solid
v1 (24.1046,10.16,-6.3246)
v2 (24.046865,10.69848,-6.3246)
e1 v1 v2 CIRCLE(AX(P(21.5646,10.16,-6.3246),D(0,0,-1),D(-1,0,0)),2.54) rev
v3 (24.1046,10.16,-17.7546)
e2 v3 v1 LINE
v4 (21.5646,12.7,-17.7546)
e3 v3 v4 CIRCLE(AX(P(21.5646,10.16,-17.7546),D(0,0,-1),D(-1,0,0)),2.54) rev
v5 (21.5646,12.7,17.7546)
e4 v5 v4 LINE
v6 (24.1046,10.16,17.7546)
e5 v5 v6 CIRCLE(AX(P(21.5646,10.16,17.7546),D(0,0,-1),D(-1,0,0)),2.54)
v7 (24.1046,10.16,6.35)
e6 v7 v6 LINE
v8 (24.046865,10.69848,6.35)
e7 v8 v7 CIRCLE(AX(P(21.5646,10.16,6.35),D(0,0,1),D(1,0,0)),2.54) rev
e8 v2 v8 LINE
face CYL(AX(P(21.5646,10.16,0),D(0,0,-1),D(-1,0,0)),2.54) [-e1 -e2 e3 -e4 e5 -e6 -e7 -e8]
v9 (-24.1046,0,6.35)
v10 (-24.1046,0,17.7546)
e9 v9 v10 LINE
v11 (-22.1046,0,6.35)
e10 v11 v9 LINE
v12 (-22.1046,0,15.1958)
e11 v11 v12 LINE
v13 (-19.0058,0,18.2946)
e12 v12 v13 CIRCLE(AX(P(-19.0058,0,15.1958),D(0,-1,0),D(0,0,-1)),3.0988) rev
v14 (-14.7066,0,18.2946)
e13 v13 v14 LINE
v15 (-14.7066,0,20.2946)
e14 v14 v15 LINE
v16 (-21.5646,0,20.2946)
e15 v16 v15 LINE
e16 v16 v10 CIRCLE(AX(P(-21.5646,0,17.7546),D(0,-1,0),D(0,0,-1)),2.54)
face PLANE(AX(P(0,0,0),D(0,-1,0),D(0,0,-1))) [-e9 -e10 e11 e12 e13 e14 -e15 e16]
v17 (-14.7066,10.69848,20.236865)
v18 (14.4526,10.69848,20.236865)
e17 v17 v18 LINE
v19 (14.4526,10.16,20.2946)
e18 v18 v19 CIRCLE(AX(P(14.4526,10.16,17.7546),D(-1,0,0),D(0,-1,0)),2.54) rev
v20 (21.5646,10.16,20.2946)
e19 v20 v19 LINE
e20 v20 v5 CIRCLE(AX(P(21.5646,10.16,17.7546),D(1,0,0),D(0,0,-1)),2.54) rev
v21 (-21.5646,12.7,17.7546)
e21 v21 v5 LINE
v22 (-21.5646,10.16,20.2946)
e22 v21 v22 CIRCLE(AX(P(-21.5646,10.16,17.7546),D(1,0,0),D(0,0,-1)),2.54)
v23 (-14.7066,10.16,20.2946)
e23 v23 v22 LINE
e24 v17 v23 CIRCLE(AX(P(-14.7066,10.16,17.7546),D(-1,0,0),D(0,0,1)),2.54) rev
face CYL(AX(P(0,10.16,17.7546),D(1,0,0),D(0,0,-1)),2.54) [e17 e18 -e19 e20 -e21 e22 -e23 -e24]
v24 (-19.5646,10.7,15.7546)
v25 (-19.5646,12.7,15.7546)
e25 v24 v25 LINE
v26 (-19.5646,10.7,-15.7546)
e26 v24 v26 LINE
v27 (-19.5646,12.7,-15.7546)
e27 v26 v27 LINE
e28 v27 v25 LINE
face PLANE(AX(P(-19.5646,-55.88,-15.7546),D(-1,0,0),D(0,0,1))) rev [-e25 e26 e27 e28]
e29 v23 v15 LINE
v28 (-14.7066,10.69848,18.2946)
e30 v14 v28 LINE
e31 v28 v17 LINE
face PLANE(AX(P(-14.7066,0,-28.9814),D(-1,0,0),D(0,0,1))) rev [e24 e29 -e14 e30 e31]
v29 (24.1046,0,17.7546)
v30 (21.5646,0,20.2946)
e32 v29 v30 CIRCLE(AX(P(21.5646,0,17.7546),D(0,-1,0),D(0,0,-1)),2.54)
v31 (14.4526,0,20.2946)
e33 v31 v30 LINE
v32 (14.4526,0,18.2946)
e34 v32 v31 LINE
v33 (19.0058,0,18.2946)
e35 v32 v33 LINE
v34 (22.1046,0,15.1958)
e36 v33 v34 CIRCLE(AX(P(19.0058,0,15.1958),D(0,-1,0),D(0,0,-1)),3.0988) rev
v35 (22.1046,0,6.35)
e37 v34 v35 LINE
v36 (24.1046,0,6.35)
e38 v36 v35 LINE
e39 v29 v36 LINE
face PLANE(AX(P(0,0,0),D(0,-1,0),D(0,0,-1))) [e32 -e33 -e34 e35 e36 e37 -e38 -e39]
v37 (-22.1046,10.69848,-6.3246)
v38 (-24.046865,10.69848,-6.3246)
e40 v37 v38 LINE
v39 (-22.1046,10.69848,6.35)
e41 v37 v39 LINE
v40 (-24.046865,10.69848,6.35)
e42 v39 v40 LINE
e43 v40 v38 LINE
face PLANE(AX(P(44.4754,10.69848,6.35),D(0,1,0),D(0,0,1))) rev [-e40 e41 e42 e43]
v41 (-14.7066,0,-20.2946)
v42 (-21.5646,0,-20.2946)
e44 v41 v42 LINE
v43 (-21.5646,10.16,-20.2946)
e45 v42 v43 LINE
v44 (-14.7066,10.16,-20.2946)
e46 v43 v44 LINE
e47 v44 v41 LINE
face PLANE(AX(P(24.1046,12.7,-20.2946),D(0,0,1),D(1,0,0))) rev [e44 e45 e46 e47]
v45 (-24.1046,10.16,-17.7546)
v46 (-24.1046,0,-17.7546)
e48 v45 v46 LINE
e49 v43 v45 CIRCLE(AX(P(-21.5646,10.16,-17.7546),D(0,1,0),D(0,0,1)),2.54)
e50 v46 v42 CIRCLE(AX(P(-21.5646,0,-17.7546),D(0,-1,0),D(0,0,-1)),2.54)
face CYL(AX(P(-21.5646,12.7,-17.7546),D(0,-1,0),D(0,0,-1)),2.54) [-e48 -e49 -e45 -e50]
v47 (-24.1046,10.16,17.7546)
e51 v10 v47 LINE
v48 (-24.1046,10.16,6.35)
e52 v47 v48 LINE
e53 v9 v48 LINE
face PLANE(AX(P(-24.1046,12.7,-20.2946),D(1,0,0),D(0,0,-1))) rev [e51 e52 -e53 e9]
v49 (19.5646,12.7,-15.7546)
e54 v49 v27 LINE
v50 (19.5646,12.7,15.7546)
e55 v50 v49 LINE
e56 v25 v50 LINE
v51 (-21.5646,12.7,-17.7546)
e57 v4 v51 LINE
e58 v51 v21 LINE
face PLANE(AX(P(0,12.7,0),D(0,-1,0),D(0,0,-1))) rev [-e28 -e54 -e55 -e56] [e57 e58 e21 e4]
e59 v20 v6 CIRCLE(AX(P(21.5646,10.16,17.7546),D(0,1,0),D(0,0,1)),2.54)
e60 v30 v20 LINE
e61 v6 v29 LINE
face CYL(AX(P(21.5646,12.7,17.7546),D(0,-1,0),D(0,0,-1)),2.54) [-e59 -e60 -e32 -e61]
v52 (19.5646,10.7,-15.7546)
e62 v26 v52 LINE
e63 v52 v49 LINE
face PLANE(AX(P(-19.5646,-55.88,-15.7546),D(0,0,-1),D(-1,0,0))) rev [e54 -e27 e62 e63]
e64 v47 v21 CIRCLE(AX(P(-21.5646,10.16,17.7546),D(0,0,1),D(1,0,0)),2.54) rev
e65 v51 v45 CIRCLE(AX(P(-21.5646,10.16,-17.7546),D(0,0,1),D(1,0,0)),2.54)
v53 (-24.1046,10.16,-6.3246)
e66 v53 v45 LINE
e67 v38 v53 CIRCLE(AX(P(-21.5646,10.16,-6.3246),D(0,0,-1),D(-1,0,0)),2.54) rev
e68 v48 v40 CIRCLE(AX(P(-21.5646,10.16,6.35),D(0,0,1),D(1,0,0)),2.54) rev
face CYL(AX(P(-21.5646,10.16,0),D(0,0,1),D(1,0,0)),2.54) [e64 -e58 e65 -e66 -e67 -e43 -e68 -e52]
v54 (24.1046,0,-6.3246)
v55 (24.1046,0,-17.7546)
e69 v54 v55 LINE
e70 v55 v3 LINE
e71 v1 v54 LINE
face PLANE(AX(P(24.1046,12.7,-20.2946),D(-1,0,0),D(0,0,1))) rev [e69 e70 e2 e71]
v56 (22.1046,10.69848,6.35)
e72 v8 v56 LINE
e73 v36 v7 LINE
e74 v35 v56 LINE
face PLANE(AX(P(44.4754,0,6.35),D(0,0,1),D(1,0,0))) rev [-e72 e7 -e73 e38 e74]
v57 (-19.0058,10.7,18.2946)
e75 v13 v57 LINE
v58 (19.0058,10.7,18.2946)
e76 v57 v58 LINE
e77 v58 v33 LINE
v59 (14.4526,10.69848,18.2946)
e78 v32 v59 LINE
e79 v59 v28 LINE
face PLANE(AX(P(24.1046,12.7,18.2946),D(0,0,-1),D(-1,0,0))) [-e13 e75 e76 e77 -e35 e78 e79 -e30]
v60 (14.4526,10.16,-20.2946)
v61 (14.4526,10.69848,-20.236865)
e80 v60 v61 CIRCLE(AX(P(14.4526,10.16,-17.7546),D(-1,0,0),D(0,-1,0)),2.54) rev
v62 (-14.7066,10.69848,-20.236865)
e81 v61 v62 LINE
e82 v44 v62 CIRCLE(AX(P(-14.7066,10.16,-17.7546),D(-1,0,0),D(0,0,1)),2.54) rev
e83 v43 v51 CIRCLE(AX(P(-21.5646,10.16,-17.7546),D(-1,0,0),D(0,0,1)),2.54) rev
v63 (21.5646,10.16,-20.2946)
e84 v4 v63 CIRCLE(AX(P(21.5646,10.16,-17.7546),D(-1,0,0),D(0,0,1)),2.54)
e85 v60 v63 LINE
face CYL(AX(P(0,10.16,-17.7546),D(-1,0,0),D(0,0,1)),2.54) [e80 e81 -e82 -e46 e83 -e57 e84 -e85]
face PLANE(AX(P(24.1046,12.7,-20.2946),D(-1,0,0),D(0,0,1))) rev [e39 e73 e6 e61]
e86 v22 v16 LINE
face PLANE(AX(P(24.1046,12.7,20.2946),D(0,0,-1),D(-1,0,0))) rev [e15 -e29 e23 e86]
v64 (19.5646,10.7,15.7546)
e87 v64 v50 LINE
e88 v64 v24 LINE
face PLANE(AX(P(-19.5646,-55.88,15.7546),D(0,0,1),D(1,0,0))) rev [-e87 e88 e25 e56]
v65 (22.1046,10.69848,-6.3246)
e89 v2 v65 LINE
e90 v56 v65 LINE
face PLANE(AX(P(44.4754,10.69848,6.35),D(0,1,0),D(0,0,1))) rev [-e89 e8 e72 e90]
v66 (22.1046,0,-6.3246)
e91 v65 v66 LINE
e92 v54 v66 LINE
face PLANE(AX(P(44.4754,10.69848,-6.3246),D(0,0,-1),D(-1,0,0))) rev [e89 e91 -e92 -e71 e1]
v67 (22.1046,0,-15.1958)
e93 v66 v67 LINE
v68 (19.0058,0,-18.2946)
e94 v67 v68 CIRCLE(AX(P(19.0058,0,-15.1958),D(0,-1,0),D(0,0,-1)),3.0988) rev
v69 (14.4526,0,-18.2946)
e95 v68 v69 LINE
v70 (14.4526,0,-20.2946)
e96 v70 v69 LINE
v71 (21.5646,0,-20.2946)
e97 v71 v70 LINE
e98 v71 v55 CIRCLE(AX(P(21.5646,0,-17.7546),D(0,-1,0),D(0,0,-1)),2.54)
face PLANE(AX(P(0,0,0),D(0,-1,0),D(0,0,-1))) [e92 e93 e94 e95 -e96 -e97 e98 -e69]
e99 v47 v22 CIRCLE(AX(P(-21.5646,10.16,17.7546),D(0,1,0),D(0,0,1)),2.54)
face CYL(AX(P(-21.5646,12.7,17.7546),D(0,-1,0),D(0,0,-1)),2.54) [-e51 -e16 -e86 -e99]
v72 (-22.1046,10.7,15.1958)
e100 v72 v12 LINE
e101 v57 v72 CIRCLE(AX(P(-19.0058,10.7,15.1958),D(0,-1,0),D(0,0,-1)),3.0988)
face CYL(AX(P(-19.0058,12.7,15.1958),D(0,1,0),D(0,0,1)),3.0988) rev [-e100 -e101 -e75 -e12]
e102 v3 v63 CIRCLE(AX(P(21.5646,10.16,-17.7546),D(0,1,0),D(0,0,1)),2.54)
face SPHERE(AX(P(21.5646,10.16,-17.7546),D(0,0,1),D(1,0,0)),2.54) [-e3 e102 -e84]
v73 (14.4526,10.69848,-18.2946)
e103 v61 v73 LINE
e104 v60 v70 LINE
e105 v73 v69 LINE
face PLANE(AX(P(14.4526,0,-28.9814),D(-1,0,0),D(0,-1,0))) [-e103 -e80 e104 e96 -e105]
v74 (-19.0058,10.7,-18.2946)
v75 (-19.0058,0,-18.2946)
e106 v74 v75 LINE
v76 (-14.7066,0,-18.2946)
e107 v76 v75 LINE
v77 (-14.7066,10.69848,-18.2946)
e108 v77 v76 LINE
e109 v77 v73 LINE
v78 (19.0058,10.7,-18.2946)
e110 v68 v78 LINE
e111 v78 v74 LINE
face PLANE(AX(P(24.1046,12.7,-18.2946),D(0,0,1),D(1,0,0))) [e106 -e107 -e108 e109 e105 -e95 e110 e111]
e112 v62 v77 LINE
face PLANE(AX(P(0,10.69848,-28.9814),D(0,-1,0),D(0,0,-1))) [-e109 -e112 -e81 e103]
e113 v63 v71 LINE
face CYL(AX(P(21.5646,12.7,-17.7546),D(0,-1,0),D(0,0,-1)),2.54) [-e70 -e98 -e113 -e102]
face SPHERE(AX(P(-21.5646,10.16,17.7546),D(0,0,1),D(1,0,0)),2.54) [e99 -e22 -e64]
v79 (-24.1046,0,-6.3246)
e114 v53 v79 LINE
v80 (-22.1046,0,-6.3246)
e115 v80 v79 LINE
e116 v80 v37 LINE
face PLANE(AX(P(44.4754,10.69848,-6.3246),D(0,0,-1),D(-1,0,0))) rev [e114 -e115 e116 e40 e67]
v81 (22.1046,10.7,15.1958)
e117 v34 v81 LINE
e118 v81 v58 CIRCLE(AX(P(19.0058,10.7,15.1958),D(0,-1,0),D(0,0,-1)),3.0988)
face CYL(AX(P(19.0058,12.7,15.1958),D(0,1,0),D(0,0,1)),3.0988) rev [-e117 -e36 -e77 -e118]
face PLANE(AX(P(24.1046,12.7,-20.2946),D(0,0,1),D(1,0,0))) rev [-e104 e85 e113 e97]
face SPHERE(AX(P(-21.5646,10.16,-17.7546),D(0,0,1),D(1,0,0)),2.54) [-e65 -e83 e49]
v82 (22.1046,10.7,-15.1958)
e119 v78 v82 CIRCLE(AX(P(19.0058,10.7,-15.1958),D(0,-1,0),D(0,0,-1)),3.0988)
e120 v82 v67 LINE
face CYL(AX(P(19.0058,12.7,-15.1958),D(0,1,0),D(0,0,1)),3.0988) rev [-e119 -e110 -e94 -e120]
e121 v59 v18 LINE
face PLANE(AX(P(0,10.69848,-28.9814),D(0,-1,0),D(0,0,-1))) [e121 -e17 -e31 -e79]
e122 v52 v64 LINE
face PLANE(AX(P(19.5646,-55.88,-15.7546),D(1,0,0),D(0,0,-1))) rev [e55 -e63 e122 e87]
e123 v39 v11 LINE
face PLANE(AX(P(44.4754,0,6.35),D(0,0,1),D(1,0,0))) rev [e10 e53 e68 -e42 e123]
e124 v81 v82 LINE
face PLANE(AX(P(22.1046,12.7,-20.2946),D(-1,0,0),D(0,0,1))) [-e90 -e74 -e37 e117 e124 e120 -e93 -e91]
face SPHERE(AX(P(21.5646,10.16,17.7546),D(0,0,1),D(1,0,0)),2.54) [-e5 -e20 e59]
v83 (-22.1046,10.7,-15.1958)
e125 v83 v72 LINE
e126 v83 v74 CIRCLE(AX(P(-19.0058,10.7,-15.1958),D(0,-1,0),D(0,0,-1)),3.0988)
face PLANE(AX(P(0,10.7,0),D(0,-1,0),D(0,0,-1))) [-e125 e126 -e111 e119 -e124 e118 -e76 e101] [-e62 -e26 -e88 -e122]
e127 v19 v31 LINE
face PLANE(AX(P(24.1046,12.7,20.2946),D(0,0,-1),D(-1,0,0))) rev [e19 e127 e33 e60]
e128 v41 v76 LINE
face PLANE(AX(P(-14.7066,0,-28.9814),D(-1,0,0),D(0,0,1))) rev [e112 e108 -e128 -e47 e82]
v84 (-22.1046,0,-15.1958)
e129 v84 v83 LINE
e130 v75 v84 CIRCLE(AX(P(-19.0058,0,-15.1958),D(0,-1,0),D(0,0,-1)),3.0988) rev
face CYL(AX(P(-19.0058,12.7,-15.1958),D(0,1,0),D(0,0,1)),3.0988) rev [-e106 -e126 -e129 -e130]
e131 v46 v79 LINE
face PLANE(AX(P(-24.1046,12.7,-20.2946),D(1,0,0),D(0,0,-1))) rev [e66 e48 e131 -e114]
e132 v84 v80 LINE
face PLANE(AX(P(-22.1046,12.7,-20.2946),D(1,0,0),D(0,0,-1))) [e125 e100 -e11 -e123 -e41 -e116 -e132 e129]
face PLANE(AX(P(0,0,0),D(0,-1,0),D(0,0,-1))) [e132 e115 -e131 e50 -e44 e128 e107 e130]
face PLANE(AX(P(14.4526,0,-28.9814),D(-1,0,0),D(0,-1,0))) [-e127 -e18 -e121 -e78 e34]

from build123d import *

# Parameters (mm, degrees)
SKETCH1_W           = 48.2092
SKETCH1_H           = 40.5892
BOSS_EXTRUDE1_DEPTH = 12.7
SHELL1_T            = -2
CUT_EXTRUDE2_DEPTH  = 68.58
FILLET6_R           = 2.54
FILLET7_R           = 2.54
FILLET8_R           = 2.54
FILLET9_R           = 2.54
FILLET10_R          = 2.54
SKETCH6_W           = 39.1292
SKETCH6_H           = 31.5092
CUT_EXTRUDE4_DEPTH  = 68.58
CUT_EXTRUDE5_DEPTH  = 49.276
FILLET19_R          = 3.0988


with BuildPart() as part:
    # Sketch1 → Boss-Extrude1 (new body)
    with BuildSketch(Plane(origin=(0, 0, 0), x_dir=(1, 0, 0), z_dir=(0, 1, 0))):
        Rectangle(SKETCH1_W, SKETCH1_H)
    extrude(amount=BOSS_EXTRUDE1_DEPTH)

    # Shell1
    shell1_openings = [part.faces().sort_by_distance(p)[0] for p in [
        (0, 0, 0),
    ]]
    offset(amount=SHELL1_T, openings=shell1_openings, kind=Kind.INTERSECTION)

    # Sketch4 → Cut-Extrude2 (cut)
    with BuildSketch(Plane.ZY.offset(24.1046)):
        Polygon((0, 0), (6.35, 0), (6.35, 10.69848), (-6.3246, 10.69848), (-6.3246, 0), align=None)
    extrude(amount=-CUT_EXTRUDE2_DEPTH, mode=Mode.SUBTRACT)

    # Fillet6
    # the kernel refuses this fillet: 2.54 mm, written as the material it takes off along each edge
    with BuildSketch(Plane(origin=(30.4546, 12.7, -20.2946), x_dir=(0, -1, 0), z_dir=(-1, 0, 0))) as fillet6_piece_1:
        with BuildLine():
            CenterArc((FILLET6_R, FILLET6_R), FILLET6_R, 180, 90)
            Line((0, FILLET6_R), (0, 0))
            Line((0, 0), (FILLET6_R, 0))
        make_face()
    extrude(amount=60.9092, mode=Mode.SUBTRACT)
    with BuildSketch(Plane(origin=(24.1046, 12.7, 26.6446), x_dir=(0, -1, 0), z_dir=(0, 0, -1)), Plane(origin=(-24.1046, 12.7, -26.6446), x_dir=(0, -1, 0), z_dir=(0, 0, 1))) as fillet6_piece_2:
        with BuildLine():
            CenterArc((FILLET6_R, FILLET6_R), FILLET6_R, 180, 90)
            Line((0, FILLET6_R), (0, 0))
            Line((0, 0), (FILLET6_R, 0))
        make_face()
    extrude(amount=53.2892, mode=Mode.SUBTRACT)
    with BuildSketch(Plane(origin=(-30.4546, 12.7, 20.2946), x_dir=(0, 0, -1), z_dir=(1, 0, 0))) as fillet6_piece_3:
        with BuildLine():
            CenterArc((FILLET6_R, -FILLET6_R), FILLET6_R, 90, 90)
            Line((0, -FILLET6_R), (0, 0))
            Line((0, 0), (FILLET6_R, 0))
        make_face()
    extrude(amount=60.9092, mode=Mode.SUBTRACT)

    # Fillet7
    # the kernel refuses this fillet: 2.54 mm, written as the material it takes off along each edge
    with BuildSketch(Plane(origin=(-21.5646, 10.16, -17.7546), x_dir=(-1, 0, 0), z_dir=(0, 0, -1))) as fillet7_piece_1_section:
        Polygon((0, 0), (FILLET7_R, 0), (FILLET7_R, FILLET7_R), (0, FILLET7_R), align=None)
    fillet7_piece_1 = extrude(amount=FILLET7_R, mode=Mode.PRIVATE)
    fillet7_piece_1 = fillet7_piece_1 - Plane(origin=(-21.5646, 10.16, -17.7546), x_dir=(0.7071067811865475, -0.7071067811865475, 0), z_dir=(0, 0, -1)) * Sphere(FILLET7_R, mode=Mode.PRIVATE)
    add(fillet7_piece_1, mode=Mode.SUBTRACT)
    with BuildSketch(Plane(origin=(-24.1046, -6.35, -20.2946), x_dir=(1, 0, 0), z_dir=(0, 1, 0))) as fillet7_piece_2:
        with BuildLine():
            CenterArc((FILLET7_R, -FILLET7_R), FILLET7_R, 90, 90)
            Line((0, -FILLET7_R), (0, 0))
            Line((0, 0), (FILLET7_R, 0))
        make_face()
    extrude(amount=16.51, mode=Mode.SUBTRACT)

    # Fillet8
    # the kernel refuses this fillet: 2.54 mm, written as the material it takes off along each edge
    with BuildSketch(Plane(origin=(-21.5646, 10.16, 17.7546), x_dir=(-1, 0, 0), z_dir=(0, 0, 1))) as fillet8_piece_1_section:
        Polygon((0, 0), (FILLET8_R, 0), (FILLET8_R, -FILLET8_R), (0, -FILLET8_R), align=None)
    fillet8_piece_1 = extrude(amount=FILLET8_R, mode=Mode.PRIVATE)
    fillet8_piece_1 = fillet8_piece_1 - Plane(origin=(-21.5646, 10.16, 17.7546), x_dir=(0.7071067811865475, -0.7071067811865475, 0), z_dir=(0, 0, 1)) * Sphere(FILLET8_R, mode=Mode.PRIVATE)
    add(fillet8_piece_1, mode=Mode.SUBTRACT)
    with BuildSketch(Plane(origin=(-24.1046, -6.35, 20.2946), x_dir=(1, 0, 0), z_dir=(0, 1, 0))) as fillet8_piece_2:
        with BuildLine():
            CenterArc((FILLET8_R, FILLET8_R), FILLET8_R, 180, 90)
            Line((0, FILLET8_R), (0, 0))
            Line((0, 0), (FILLET8_R, 0))
        make_face()
    extrude(amount=16.51, mode=Mode.SUBTRACT)

    # Fillet9
    # the kernel refuses this fillet: 2.54 mm, written as the material it takes off along each edge
    with BuildSketch(Plane(origin=(21.5646, 10.16, -17.7546), x_dir=(1, 0, 0), z_dir=(0, 0, -1))) as fillet9_piece_1_section:
        Polygon((0, 0), (FILLET9_R, 0), (FILLET9_R, -FILLET9_R), (0, -FILLET9_R), align=None)
    fillet9_piece_1 = extrude(amount=FILLET9_R, mode=Mode.PRIVATE)
    fillet9_piece_1 = fillet9_piece_1 - Plane(origin=(21.5646, 10.16, -17.7546), x_dir=(-0.7071067811865475, -0.7071067811865475, 0), z_dir=(0, 0, -1)) * Sphere(FILLET9_R, mode=Mode.PRIVATE)
    add(fillet9_piece_1, mode=Mode.SUBTRACT)
    with BuildSketch(Plane(origin=(24.1046, -6.35, -20.2946), x_dir=(-1, 0, 0), z_dir=(0, 1, 0))) as fillet9_piece_2:
        with BuildLine():
            CenterArc((FILLET9_R, FILLET9_R), FILLET9_R, 180, 90)
            Line((0, FILLET9_R), (0, 0))
            Line((0, 0), (FILLET9_R, 0))
        make_face()
    extrude(amount=16.51, mode=Mode.SUBTRACT)

    # Fillet10
    # the kernel refuses this fillet: 2.54 mm, written as the material it takes off along each edge
    with BuildSketch(Plane(origin=(21.5646, 10.16, 17.7546), x_dir=(1, 0, 0), z_dir=(0, 0, 1))) as fillet10_piece_1_section:
        Polygon((0, 0), (FILLET10_R, 0), (FILLET10_R, FILLET10_R), (0, FILLET10_R), align=None)
    fillet10_piece_1 = extrude(amount=FILLET10_R, mode=Mode.PRIVATE)
    fillet10_piece_1 = fillet10_piece_1 - Plane(origin=(21.5646, 10.16, 17.7546), x_dir=(-0.7071067811865475, -0.7071067811865475, 0), z_dir=(0, 0, 1)) * Sphere(FILLET10_R, mode=Mode.PRIVATE)
    add(fillet10_piece_1, mode=Mode.SUBTRACT)
    with BuildSketch(Plane(origin=(24.1046, -6.35, 20.2946), x_dir=(-1, 0, 0), z_dir=(0, 1, 0))) as fillet10_piece_2:
        with BuildLine():
            CenterArc((FILLET10_R, -FILLET10_R), FILLET10_R, 90, 90)
            Line((0, -FILLET10_R), (0, 0))
            Line((0, 0), (FILLET10_R, 0))
        make_face()
    extrude(amount=16.51, mode=Mode.SUBTRACT)

    # Sketch6 → Cut-Extrude4 (cut)
    with BuildSketch(Plane(origin=(0, 12.7, 0), x_dir=(1, 0, 0), z_dir=(0, 1, 0))):
        Rectangle(SKETCH6_W, SKETCH6_H)
    extrude(amount=-CUT_EXTRUDE4_DEPTH, mode=Mode.SUBTRACT)

    # Sketch3 → Cut-Extrude5 (cut)
    with BuildSketch(Plane.XY.offset(20.2946)):
        Polygon((14.4526, 10.69848), (-12.1666, 10.69848), (-14.7066, 10.69848), (-14.7066, 0), (14.4526, 0), align=None)
    extrude(amount=-CUT_EXTRUDE5_DEPTH, mode=Mode.SUBTRACT)

    # Fillet19
    fillet19_edges = [part.edges().sort_by_distance(p)[0] for p in [
        (-22.1046, 5.35, -18.2946),
        (-22.1046, 5.35, 18.2946),
        (22.1046, 5.35, 18.2946),
        (22.1046, 5.35, -18.2946),
    ]]
    fillet(fillet19_edges, radius=FILLET19_R)


solid = part.part
